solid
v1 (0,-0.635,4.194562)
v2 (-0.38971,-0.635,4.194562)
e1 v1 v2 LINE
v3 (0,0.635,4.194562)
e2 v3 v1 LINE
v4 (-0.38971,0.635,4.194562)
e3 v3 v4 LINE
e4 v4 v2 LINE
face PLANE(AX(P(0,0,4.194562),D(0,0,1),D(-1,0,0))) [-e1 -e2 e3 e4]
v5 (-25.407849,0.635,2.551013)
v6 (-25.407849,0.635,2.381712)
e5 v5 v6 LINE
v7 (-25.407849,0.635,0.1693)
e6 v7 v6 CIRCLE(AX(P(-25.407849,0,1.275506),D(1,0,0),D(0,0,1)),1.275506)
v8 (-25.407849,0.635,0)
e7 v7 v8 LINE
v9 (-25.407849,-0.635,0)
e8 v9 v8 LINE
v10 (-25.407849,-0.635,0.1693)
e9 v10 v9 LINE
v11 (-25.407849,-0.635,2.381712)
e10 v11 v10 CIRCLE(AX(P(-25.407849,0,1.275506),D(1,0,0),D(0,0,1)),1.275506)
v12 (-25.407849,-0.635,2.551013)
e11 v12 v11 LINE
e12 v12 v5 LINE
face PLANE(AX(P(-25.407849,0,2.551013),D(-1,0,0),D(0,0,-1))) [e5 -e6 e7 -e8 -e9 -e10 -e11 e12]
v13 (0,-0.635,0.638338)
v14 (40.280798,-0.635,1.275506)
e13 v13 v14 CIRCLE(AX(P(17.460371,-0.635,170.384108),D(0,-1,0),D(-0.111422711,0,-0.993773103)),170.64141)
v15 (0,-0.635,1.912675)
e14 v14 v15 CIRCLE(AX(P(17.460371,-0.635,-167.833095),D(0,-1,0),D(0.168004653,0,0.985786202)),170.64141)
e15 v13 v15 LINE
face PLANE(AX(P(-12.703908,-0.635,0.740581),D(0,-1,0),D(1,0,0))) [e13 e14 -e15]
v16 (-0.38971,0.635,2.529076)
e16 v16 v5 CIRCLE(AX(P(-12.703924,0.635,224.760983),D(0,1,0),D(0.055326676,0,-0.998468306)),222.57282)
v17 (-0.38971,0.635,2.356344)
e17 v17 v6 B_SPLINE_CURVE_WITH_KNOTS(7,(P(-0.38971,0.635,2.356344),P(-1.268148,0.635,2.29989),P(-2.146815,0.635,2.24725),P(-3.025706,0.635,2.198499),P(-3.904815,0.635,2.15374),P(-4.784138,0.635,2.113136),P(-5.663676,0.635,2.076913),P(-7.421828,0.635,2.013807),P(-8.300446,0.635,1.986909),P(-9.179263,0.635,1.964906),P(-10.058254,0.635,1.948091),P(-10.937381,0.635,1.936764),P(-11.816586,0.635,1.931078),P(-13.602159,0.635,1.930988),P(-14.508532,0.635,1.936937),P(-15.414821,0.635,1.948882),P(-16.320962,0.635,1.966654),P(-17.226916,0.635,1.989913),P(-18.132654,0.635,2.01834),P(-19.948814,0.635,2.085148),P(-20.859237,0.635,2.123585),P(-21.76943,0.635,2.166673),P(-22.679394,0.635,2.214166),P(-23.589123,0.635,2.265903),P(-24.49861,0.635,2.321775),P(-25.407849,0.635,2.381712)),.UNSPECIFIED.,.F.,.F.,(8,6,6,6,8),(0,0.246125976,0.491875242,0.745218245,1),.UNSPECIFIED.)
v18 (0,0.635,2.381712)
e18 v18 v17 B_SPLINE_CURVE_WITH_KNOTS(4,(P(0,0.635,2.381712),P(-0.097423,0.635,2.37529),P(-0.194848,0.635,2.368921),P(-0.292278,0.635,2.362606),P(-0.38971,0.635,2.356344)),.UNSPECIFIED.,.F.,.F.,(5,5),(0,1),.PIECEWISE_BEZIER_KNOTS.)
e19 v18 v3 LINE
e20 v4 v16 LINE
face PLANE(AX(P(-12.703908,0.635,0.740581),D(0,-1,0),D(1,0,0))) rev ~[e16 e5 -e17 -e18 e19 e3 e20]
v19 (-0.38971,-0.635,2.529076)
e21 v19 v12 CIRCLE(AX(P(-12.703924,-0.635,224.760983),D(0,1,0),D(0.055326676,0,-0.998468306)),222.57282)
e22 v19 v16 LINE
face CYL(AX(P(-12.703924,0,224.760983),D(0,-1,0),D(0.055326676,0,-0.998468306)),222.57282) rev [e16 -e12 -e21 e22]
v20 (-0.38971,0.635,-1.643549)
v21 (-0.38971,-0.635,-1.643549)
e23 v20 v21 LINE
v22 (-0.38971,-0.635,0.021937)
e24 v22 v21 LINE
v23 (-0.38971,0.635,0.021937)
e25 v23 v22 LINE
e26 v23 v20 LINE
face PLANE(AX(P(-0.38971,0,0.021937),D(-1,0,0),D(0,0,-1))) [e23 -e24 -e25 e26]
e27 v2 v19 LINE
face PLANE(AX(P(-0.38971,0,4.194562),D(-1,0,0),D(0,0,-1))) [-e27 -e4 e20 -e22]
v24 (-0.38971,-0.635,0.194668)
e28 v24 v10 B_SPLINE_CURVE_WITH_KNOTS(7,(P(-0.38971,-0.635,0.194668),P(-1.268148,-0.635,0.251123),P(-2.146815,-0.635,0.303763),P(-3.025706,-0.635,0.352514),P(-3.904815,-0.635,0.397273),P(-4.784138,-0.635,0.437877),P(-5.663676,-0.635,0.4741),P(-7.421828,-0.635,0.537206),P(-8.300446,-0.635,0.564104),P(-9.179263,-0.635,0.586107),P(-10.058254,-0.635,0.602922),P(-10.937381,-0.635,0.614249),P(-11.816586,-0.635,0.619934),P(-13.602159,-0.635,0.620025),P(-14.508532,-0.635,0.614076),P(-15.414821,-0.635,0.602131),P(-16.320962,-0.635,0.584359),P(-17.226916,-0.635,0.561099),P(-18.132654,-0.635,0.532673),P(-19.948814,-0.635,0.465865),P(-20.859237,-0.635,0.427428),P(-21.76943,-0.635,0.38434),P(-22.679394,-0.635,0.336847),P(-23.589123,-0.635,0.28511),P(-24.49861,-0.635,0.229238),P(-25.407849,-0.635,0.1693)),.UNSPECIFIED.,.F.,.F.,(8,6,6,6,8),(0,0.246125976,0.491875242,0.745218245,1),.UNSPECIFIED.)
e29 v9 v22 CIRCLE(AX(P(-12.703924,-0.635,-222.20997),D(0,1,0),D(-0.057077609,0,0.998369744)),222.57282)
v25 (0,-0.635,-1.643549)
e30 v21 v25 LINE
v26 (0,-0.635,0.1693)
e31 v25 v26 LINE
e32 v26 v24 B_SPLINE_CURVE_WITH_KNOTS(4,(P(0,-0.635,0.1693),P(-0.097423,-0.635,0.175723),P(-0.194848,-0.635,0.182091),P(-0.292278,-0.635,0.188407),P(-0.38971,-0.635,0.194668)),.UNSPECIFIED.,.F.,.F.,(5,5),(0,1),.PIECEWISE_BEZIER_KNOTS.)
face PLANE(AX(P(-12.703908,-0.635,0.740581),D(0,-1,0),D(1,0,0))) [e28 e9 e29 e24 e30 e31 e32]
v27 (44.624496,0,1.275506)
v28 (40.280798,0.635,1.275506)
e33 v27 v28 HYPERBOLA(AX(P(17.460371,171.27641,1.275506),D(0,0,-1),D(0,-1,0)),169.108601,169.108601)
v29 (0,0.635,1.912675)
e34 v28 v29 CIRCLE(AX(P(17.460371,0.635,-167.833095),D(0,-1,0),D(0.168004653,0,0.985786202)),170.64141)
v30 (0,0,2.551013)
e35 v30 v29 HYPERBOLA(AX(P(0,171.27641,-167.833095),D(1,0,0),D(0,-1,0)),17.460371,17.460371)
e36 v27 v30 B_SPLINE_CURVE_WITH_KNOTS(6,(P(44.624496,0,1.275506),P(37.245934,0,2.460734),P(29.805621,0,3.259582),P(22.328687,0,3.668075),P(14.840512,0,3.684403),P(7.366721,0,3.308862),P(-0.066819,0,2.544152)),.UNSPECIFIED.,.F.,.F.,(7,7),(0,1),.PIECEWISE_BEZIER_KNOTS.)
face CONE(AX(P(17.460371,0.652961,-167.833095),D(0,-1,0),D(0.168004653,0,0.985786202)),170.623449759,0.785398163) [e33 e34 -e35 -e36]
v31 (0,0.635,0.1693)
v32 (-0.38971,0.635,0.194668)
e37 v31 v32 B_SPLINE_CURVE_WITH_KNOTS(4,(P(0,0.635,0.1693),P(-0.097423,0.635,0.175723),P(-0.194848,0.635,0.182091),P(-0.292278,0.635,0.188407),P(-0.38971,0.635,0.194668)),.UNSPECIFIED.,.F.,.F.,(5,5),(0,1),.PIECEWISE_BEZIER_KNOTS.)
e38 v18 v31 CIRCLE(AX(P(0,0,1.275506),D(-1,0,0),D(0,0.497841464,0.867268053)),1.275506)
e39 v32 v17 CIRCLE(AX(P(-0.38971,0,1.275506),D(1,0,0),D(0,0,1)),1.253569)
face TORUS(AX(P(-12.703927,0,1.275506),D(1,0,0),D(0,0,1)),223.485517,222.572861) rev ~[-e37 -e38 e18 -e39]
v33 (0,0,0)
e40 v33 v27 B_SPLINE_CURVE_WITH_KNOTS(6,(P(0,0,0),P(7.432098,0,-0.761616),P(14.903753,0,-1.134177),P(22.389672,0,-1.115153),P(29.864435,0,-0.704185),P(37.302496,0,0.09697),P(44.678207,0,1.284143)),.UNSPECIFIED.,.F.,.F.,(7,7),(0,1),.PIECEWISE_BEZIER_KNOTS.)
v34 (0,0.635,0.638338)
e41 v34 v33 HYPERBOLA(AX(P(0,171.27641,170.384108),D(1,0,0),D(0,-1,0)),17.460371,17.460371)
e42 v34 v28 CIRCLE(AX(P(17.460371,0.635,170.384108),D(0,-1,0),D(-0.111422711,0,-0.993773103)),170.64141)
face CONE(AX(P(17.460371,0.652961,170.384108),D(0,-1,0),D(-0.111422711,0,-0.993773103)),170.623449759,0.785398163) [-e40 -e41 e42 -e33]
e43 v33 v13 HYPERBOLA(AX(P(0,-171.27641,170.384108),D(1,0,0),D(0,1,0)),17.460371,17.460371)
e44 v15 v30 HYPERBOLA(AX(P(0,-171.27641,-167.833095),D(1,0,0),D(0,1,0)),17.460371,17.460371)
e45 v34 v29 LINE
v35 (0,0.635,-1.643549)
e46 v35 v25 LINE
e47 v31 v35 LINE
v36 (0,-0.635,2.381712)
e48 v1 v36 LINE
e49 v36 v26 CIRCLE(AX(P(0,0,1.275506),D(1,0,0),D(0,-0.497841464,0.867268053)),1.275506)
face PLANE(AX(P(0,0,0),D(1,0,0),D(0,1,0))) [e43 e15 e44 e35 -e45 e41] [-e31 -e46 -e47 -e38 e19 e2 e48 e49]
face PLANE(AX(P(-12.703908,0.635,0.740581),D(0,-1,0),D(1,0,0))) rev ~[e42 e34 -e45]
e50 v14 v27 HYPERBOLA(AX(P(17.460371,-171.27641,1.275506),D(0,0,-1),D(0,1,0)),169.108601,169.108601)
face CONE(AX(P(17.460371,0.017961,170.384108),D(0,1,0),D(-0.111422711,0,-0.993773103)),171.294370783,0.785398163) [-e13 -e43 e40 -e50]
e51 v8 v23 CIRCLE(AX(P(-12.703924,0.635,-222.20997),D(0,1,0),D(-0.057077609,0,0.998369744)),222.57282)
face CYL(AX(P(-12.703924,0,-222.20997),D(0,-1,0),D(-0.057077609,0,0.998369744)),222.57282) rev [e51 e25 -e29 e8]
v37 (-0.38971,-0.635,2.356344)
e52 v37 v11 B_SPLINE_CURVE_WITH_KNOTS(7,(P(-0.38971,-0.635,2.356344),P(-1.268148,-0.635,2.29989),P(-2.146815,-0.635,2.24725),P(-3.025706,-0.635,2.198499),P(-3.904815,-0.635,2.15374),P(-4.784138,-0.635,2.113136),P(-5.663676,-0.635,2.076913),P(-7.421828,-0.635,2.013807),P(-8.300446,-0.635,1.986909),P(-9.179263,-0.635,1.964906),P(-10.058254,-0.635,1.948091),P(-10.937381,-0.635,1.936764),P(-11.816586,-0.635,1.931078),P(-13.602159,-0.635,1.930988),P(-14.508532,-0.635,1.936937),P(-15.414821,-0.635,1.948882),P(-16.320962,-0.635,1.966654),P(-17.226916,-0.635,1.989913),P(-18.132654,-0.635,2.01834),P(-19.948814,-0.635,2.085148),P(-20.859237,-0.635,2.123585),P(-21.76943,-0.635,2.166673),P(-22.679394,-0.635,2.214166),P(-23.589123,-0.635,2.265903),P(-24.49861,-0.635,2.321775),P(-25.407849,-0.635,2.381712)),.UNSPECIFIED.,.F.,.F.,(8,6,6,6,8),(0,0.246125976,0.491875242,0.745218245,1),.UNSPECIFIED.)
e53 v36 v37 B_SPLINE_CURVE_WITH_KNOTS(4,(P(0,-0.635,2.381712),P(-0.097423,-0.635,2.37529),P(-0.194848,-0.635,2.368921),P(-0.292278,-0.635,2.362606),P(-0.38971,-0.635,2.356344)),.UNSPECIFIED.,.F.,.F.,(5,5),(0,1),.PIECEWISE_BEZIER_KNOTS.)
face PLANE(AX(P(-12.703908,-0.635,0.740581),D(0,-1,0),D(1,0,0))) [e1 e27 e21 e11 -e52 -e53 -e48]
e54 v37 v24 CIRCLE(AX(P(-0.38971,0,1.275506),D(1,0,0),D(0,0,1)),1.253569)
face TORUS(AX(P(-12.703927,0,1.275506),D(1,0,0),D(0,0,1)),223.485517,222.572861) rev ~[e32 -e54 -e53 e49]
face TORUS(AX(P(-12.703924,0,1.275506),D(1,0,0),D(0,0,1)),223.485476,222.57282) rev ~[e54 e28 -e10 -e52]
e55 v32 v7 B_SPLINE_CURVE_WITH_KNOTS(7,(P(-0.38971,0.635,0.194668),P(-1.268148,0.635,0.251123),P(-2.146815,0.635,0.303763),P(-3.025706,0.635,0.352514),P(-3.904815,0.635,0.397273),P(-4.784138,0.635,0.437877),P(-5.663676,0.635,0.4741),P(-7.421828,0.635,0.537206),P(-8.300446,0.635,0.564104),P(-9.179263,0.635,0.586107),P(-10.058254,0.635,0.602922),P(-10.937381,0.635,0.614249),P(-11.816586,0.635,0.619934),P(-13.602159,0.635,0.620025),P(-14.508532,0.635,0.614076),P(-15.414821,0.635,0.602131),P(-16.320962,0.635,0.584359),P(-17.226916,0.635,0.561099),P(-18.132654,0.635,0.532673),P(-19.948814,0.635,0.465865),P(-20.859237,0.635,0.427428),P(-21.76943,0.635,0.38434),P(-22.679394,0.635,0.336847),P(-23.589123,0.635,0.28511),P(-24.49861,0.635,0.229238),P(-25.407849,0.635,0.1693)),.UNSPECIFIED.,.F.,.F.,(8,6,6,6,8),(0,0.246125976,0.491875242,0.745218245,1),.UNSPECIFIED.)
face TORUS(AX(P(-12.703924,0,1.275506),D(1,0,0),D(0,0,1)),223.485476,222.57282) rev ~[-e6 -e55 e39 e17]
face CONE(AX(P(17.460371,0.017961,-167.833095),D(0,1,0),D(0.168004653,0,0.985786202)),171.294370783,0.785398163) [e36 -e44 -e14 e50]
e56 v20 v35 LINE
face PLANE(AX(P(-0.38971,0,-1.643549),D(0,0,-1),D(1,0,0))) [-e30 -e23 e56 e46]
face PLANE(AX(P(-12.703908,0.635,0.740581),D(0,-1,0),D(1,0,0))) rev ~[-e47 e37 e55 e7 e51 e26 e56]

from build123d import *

# Parameters (mm, degrees)
F2_DEPTH     = 0.635
F3_T4_ANGLE  = 16.069160735
F3_S5_R      = 171.2764102712
F3_T6_DEPTH  = 27
F3_T11_ANGLE = 16.069160735
F3_S13_R     = 171.2764102712
F3_T14_DEPTH = 27
F3_T18_ANGLE = 16.069160735
F3_S20_R     = 171.2764102712
F3_T21_DEPTH = 27
F3_T25_ANGLE = 16.069160735
F3_S27_R     = 171.2764102712
F3_T28_DEPTH = 27
F3_T33_ANGLE = 16.069160735
F3_S34_R     = 171.2764102712
F3_T35_DEPTH = 27
F3_T38_ANGLE = 16.069160735
F3_S39_R     = 171.2764102712
F3_T40_DEPTH = 27
F3_T46_ANGLE = 16.069160735
F3_S47_R     = 171.2764102712
F3_T48_DEPTH = 27
F3_T51_ANGLE = 16.069160735
F3_S52_R     = 171.2764102712
F3_T53_DEPTH = 27


# Not quite as in the source:
# - a fillet or chamfer that OpenCascade refuses, or shapes differently, is made with other operations: its cross-section is extruded or revolved along the edge and cut away or added


with BuildPart() as f1:
    # F0 (on Front) → F1 (revolve)
    with BuildSketch(Plane.XZ):
        with BuildLine():
            Line((-25.4078488797, 1.2755064527), (0, 1.2755064527))
            Line((0, 1.2755064527), (0, 2.5510129053))
            ThreePointArc((0, 2.5510129053), (-0.1948502254, 2.5399588642), (-0.3897100687, 2.5290756822))
            ThreePointArc((-0.3897100687, 2.5290756822), (-12.8990879478, 2.1882478839), (-25.4078488797, 2.5510129053))
            Line((-25.4078488797, 2.5510129053), (-25.4078488797, 1.2755064527))
        make_face()
    revolve(axis=Axis((-12.7039244398, 0, 1.2755064527), (1, 0, 0)))

    # F0 (on Front) → F2 (join, symmetric)
    with BuildSketch(Plane.XZ):
        with BuildLine():
            ThreePointArc((-0.3897100687, 0.0219372231), (-0.1948502254, 0.0110540411), (0, 0))
            Line((0, 0), (0, 1.2755064527))
            Line((0, 1.2755064527), (-25.4078488797, 1.2755064527))
            Line((-25.4078488797, 1.2755064527), (-25.4078488797, 0))
            ThreePointArc((-25.4078488797, 0), (-12.8990879478, 0.3627650215), (-0.3897100687, 0.0219372231))
        make_face()
        with BuildLine():
            Line((0, -1.6435489524), (0, 0))
            ThreePointArc((0, 0), (-0.1948502254, 0.0110540411), (-0.3897100687, 0.0219372231))
            Line((-0.3897100687, 0.0219372231), (-0.3897100687, -1.6435489524))
            Line((-0.3897100687, -1.6435489524), (0, -1.6435489524))
        make_face()
        with BuildLine():
            Line((0, 1.2755064527), (0, 0))
            ThreePointArc((0, 0), (22.353983247, -0.8223795413), (44.6244962513, 1.2755064527))
            Line((44.6244962513, 1.2755064527), (0, 1.2755064527))
        make_face()
        with BuildLine():
            Line((-25.4078488797, 1.2755064527), (0, 1.2755064527))
            Line((0, 1.2755064527), (0, 2.5510129053))
            ThreePointArc((0, 2.5510129053), (-0.1948502254, 2.5399588642), (-0.3897100687, 2.5290756822))
            ThreePointArc((-0.3897100687, 2.5290756822), (-12.8990879478, 2.1882478839), (-25.4078488797, 2.5510129053))
            Line((-25.4078488797, 2.5510129053), (-25.4078488797, 1.2755064527))
        make_face()
        with BuildLine():
            Line((0, 2.5510129053), (0, 1.2755064527))
            Line((0, 1.2755064527), (44.6244962513, 1.2755064527))
            ThreePointArc((44.6244962513, 1.2755064527), (22.353983247, 3.3733924466), (0, 2.5510129053))
        make_face()
        with BuildLine():
            ThreePointArc((-0.3897100687, 2.5290756822), (-0.1948502254, 2.5399588642), (0, 2.5510129053))
            Line((0, 2.5510129053), (0, 4.1945618577))
            Line((0, 4.1945618577), (-0.3897100687, 4.1945618577))
            Line((-0.3897100687, 4.1945618577), (-0.3897100687, 2.5290756822))
        make_face()
    extrude(amount=F2_DEPTH, both=True)

    # F3: chamfer of 0.635 on 4 edges, made by hand


with BuildPart() as f3_tool2:
    # F3_s3 → F3_t4 (revolve)
    with BuildSketch(Plane(origin=(44.7635003775, 0, -7.6289121798), x_dir=(0, 1, 0), z_dir=(0.9857862022, 0, -0.1680046534))):
        with BuildLine():
            Line((0.0179605122, 8.7802452438), (-0.6529605122, 8.1093242193))
            Line((-0.6529605122, 8.1093242193), (-0.6656605122, 8.1093242193))
            ThreePointArc((-0.6656605122, 8.1093242193), (-0.6477, 8.4358044754), (-0.6477, 8.7622847316))
            Line((-0.6477, 8.7622847316), (-0.635, 8.7749847316))
            ThreePointArc((-0.635, 8.7749847316), (-0.3085197439, 8.7749847316), (0.0179605122, 8.7929452438))
            Line((0.0179605122, 8.7929452438), (0.0179605122, 8.7802452438))
        make_face()
    revolve(axis=Axis((17.4603710483, -0.635, -167.8330947992), (0, -1, 0)), revolution_arc=F3_T4_ANGLE)

    # F3_s5 → F3_t6 (intersect, symmetric)
    with BuildSketch(Plane.XZ.offset(0.5)):
        with Locations((17.4603710483, 170.3841077045)):
            Circle(F3_S5_R)
    extrude(amount=F3_T6_DEPTH, both=True, mode=Mode.INTERSECT)

    split(bisect_by=Plane.YZ, keep=Keep.TOP)


with BuildPart() as f1_1:
    add(f1.part)

    # F3_t1: cut F3_tool2
    add(f3_tool2.part, mode=Mode.SUBTRACT)


with BuildPart() as f3_tool9:
    # F3_s10 → F3_t11 (revolve)
    with BuildSketch(Plane(origin=(44.7635003775, 0, -7.6289121798), x_dir=(0, 1, 0), z_dir=(0.9857862022, 0, -0.1680046534))):
        with BuildLine():
            Line((0.6529605122, 8.1093242193), (-0.0179605122, 8.7802452438))
            Line((-0.0179605122, 8.7802452438), (-0.0179605122, 8.7929452438))
            ThreePointArc((-0.0179605122, 8.7929452438), (0.3085197439, 8.7749847316), (0.635, 8.7749847316))
            Line((0.635, 8.7749847316), (0.6477, 8.7622847316))
            ThreePointArc((0.6477, 8.7622847316), (0.6477, 8.4358044754), (0.6656605122, 8.1093242193))
            Line((0.6656605122, 8.1093242193), (0.6529605122, 8.1093242193))
        make_face()
    revolve(axis=Axis((17.4603710483, 0.635, -167.8330947992), (0, -1, 0)), revolution_arc=F3_T11_ANGLE)

    split(bisect_by=Plane.YZ, keep=Keep.TOP)

    # F3_s13 → F3_t14 (intersect, symmetric)
    with BuildSketch(Plane.XZ.offset(-0.5)):
        with Locations((17.4603710483, 170.3841077045)):
            Circle(F3_S13_R)
    extrude(amount=F3_T14_DEPTH, both=True, mode=Mode.INTERSECT)


with BuildPart() as f1_2:
    add(f1_1.part)

    # F3_t8: cut F3_tool9
    add(f3_tool9.part, mode=Mode.SUBTRACT)


with BuildPart() as f3_tool16:
    # F3_s17 → F3_t18 (revolve)
    with BuildSketch(Plane(origin=(-1.6228435165, 0, 0.1819546373), x_dir=(0, 1, 0), z_dir=(-0.9937731026, 0, 0.1114227112))):
        with BuildLine():
            Line((0.6529605122, -0.6451754671), (-0.0179605122, 0.0257455574))
            Line((-0.0179605122, 0.0257455574), (-0.0179605122, 0.0384455574))
            ThreePointArc((-0.0179605122, 0.0384455574), (0.3085197439, 0.0204850452), (0.635, 0.0204850452))
            Line((0.635, 0.0204850452), (0.6477, 0.0077850452))
            ThreePointArc((0.6477, 0.0077850452), (0.6477, -0.318695211), (0.6656605122, -0.6451754671))
            Line((0.6656605122, -0.6451754671), (0.6529605122, -0.6451754671))
        make_face()
    revolve(axis=Axis((17.4603710483, 0.635, 170.3841077045), (0, -1, 0)), revolution_arc=F3_T18_ANGLE)

    split(bisect_by=Plane.YZ, keep=Keep.TOP)

    # F3_s20 → F3_t21 (intersect, symmetric)
    with BuildSketch(Plane.XZ.offset(-0.5)):
        with Locations((17.4603710483, -167.8330947992)):
            Circle(F3_S20_R)
    extrude(amount=F3_T21_DEPTH, both=True, mode=Mode.INTERSECT)


with BuildPart() as f1_3:
    add(f1_2.part)

    # F3_t15: cut F3_tool16
    add(f3_tool16.part, mode=Mode.SUBTRACT)


with BuildPart() as f3_tool23:
    # F3_s24 → F3_t25 (revolve)
    with BuildSketch(Plane(origin=(-1.6228435165, 0, 0.1819546373), x_dir=(0, 1, 0), z_dir=(-0.9937731026, 0, 0.1114227112))):
        with BuildLine():
            Line((0.0179605122, 0.0257455574), (-0.6529605122, -0.6451754671))
            Line((-0.6529605122, -0.6451754671), (-0.6656605122, -0.6451754671))
            ThreePointArc((-0.6656605122, -0.6451754671), (-0.6477, -0.318695211), (-0.6477, 0.0077850452))
            Line((-0.6477, 0.0077850452), (-0.635, 0.0204850452))
            ThreePointArc((-0.635, 0.0204850452), (-0.3085197439, 0.0204850452), (0.0179605122, 0.0384455574))
            Line((0.0179605122, 0.0384455574), (0.0179605122, 0.0257455574))
        make_face()
    revolve(axis=Axis((17.4603710483, -0.635, 170.3841077045), (0, -1, 0)), revolution_arc=F3_T25_ANGLE)

    split(bisect_by=Plane.YZ, keep=Keep.TOP)

    # F3_s27 → F3_t28 (intersect, symmetric)
    with BuildSketch(Plane.XZ.offset(0.5)):
        with Locations((17.4603710483, -167.8330947992)):
            Circle(F3_S27_R)
    extrude(amount=F3_T28_DEPTH, both=True, mode=Mode.INTERSECT)


with BuildPart() as f1_4:
    add(f1_3.part)

    # F3_t22: cut F3_tool23
    add(f3_tool23.part, mode=Mode.SUBTRACT)


with BuildPart() as f3_tool31:
    # F3_s32 → F3_t33 (revolve)
    with BuildSketch(Plane(origin=(-1.6228435165, 0, 0.1819546373), x_dir=(0, 1, 0), z_dir=(-0.9937731026, 0, 0.1114227112))):
        with BuildLine():
            Line((0.0179605122, 0.0257455574), (-0.6529605122, -0.6451754671))
            Line((-0.6529605122, -0.6451754671), (-0.6656605122, -0.6451754671))
            ThreePointArc((-0.6656605122, -0.6451754671), (-0.6477, -0.318695211), (-0.6477, 0.0077850452))
            Line((-0.6477, 0.0077850452), (-0.635, 0.0204850452))
            ThreePointArc((-0.635, 0.0204850452), (-0.3085197439, 0.0204850452), (0.0179605122, 0.0384455574))
            Line((0.0179605122, 0.0384455574), (0.0179605122, 0.0257455574))
        make_face()
    revolve(axis=Axis((17.4603710483, -0.635, 170.3841077045), (0, -1, 0)), revolution_arc=F3_T33_ANGLE)

    # F3_s34 → F3_t35 (cut, symmetric)
    with BuildSketch(Plane.XZ.offset(0.5)):
        with Locations((17.4603710483, -167.8330947992)):
            Circle(F3_S34_R)
    extrude(amount=F3_T35_DEPTH, both=True, mode=Mode.SUBTRACT)


with BuildPart() as f3_tool36:
    # F3_s37 → F3_t38 (revolve)
    with BuildSketch(Plane(origin=(44.7635003775, 0, -7.6289121798), x_dir=(0, 1, 0), z_dir=(0.9857862022, 0, -0.1680046534))):
        with BuildLine():
            Line((0.0179605122, 8.7802452438), (-0.6529605122, 8.1093242193))
            Line((-0.6529605122, 8.1093242193), (-0.6656605122, 8.1093242193))
            ThreePointArc((-0.6656605122, 8.1093242193), (-0.6477, 8.4358044754), (-0.6477, 8.7622847316))
            Line((-0.6477, 8.7622847316), (-0.635, 8.7749847316))
            ThreePointArc((-0.635, 8.7749847316), (-0.3085197439, 8.7749847316), (0.0179605122, 8.7929452438))
            Line((0.0179605122, 8.7929452438), (0.0179605122, 8.7802452438))
        make_face()
    revolve(axis=Axis((17.4603710483, -0.635, -167.8330947992), (0, -1, 0)), revolution_arc=F3_T38_ANGLE)

    # F3_s39 → F3_t40 (cut, symmetric)
    with BuildSketch(Plane.XZ.offset(0.5)):
        with Locations((17.4603710483, 170.3841077045)):
            Circle(F3_S39_R)
    extrude(amount=F3_T40_DEPTH, both=True, mode=Mode.SUBTRACT)


with BuildPart() as f3_tool31_1:
    add(f3_tool31.part)

    # F3_t41: intersect F3_tool36
    add(f3_tool36.part, mode=Mode.INTERSECT)


with BuildPart() as f1_5:
    add(f1_4.part)

    # F3_t29: cut F3_tool31
    add(f3_tool31_1.part, mode=Mode.SUBTRACT)


with BuildPart() as f3_tool44:
    # F3_s45 → F3_t46 (revolve)
    with BuildSketch(Plane(origin=(44.7635003775, 0, -7.6289121798), x_dir=(0, 1, 0), z_dir=(0.9857862022, 0, -0.1680046534))):
        with BuildLine():
            Line((0.6529605122, 8.1093242193), (-0.0179605122, 8.7802452438))
            Line((-0.0179605122, 8.7802452438), (-0.0179605122, 8.7929452438))
            ThreePointArc((-0.0179605122, 8.7929452438), (0.3085197439, 8.7749847316), (0.635, 8.7749847316))
            Line((0.635, 8.7749847316), (0.6477, 8.7622847316))
            ThreePointArc((0.6477, 8.7622847316), (0.6477, 8.4358044754), (0.6656605122, 8.1093242193))
            Line((0.6656605122, 8.1093242193), (0.6529605122, 8.1093242193))
        make_face()
    revolve(axis=Axis((17.4603710483, 0.635, -167.8330947992), (0, -1, 0)), revolution_arc=F3_T46_ANGLE)

    # F3_s47 → F3_t48 (cut, symmetric)
    with BuildSketch(Plane.XZ.offset(-0.5)):
        with Locations((17.4603710483, 170.3841077045)):
            Circle(F3_S47_R)
    extrude(amount=F3_T48_DEPTH, both=True, mode=Mode.SUBTRACT)


with BuildPart() as f3_tool49:
    # F3_s50 → F3_t51 (revolve)
    with BuildSketch(Plane(origin=(-1.6228435165, 0, 0.1819546373), x_dir=(0, 1, 0), z_dir=(-0.9937731026, 0, 0.1114227112))):
        with BuildLine():
            Line((0.6529605122, -0.6451754671), (-0.0179605122, 0.0257455574))
            Line((-0.0179605122, 0.0257455574), (-0.0179605122, 0.0384455574))
            ThreePointArc((-0.0179605122, 0.0384455574), (0.3085197439, 0.0204850452), (0.635, 0.0204850452))
            Line((0.635, 0.0204850452), (0.6477, 0.0077850452))
            ThreePointArc((0.6477, 0.0077850452), (0.6477, -0.318695211), (0.6656605122, -0.6451754671))
            Line((0.6656605122, -0.6451754671), (0.6529605122, -0.6451754671))
        make_face()
    revolve(axis=Axis((17.4603710483, 0.635, 170.3841077045), (0, -1, 0)), revolution_arc=F3_T51_ANGLE)

    # F3_s52 → F3_t53 (cut, symmetric)
    with BuildSketch(Plane.XZ.offset(-0.5)):
        with Locations((17.4603710483, -167.8330947992)):
            Circle(F3_S52_R)
    extrude(amount=F3_T53_DEPTH, both=True, mode=Mode.SUBTRACT)


with BuildPart() as f3_tool44_1:
    add(f3_tool44.part)

    # F3_t54: intersect F3_tool49
    add(f3_tool49.part, mode=Mode.INTERSECT)


with BuildPart() as f1_6:
    add(f1_5.part)

    # F3_t42: cut F3_tool44
    add(f3_tool44_1.part, mode=Mode.SUBTRACT)


solid = f1_6.part
